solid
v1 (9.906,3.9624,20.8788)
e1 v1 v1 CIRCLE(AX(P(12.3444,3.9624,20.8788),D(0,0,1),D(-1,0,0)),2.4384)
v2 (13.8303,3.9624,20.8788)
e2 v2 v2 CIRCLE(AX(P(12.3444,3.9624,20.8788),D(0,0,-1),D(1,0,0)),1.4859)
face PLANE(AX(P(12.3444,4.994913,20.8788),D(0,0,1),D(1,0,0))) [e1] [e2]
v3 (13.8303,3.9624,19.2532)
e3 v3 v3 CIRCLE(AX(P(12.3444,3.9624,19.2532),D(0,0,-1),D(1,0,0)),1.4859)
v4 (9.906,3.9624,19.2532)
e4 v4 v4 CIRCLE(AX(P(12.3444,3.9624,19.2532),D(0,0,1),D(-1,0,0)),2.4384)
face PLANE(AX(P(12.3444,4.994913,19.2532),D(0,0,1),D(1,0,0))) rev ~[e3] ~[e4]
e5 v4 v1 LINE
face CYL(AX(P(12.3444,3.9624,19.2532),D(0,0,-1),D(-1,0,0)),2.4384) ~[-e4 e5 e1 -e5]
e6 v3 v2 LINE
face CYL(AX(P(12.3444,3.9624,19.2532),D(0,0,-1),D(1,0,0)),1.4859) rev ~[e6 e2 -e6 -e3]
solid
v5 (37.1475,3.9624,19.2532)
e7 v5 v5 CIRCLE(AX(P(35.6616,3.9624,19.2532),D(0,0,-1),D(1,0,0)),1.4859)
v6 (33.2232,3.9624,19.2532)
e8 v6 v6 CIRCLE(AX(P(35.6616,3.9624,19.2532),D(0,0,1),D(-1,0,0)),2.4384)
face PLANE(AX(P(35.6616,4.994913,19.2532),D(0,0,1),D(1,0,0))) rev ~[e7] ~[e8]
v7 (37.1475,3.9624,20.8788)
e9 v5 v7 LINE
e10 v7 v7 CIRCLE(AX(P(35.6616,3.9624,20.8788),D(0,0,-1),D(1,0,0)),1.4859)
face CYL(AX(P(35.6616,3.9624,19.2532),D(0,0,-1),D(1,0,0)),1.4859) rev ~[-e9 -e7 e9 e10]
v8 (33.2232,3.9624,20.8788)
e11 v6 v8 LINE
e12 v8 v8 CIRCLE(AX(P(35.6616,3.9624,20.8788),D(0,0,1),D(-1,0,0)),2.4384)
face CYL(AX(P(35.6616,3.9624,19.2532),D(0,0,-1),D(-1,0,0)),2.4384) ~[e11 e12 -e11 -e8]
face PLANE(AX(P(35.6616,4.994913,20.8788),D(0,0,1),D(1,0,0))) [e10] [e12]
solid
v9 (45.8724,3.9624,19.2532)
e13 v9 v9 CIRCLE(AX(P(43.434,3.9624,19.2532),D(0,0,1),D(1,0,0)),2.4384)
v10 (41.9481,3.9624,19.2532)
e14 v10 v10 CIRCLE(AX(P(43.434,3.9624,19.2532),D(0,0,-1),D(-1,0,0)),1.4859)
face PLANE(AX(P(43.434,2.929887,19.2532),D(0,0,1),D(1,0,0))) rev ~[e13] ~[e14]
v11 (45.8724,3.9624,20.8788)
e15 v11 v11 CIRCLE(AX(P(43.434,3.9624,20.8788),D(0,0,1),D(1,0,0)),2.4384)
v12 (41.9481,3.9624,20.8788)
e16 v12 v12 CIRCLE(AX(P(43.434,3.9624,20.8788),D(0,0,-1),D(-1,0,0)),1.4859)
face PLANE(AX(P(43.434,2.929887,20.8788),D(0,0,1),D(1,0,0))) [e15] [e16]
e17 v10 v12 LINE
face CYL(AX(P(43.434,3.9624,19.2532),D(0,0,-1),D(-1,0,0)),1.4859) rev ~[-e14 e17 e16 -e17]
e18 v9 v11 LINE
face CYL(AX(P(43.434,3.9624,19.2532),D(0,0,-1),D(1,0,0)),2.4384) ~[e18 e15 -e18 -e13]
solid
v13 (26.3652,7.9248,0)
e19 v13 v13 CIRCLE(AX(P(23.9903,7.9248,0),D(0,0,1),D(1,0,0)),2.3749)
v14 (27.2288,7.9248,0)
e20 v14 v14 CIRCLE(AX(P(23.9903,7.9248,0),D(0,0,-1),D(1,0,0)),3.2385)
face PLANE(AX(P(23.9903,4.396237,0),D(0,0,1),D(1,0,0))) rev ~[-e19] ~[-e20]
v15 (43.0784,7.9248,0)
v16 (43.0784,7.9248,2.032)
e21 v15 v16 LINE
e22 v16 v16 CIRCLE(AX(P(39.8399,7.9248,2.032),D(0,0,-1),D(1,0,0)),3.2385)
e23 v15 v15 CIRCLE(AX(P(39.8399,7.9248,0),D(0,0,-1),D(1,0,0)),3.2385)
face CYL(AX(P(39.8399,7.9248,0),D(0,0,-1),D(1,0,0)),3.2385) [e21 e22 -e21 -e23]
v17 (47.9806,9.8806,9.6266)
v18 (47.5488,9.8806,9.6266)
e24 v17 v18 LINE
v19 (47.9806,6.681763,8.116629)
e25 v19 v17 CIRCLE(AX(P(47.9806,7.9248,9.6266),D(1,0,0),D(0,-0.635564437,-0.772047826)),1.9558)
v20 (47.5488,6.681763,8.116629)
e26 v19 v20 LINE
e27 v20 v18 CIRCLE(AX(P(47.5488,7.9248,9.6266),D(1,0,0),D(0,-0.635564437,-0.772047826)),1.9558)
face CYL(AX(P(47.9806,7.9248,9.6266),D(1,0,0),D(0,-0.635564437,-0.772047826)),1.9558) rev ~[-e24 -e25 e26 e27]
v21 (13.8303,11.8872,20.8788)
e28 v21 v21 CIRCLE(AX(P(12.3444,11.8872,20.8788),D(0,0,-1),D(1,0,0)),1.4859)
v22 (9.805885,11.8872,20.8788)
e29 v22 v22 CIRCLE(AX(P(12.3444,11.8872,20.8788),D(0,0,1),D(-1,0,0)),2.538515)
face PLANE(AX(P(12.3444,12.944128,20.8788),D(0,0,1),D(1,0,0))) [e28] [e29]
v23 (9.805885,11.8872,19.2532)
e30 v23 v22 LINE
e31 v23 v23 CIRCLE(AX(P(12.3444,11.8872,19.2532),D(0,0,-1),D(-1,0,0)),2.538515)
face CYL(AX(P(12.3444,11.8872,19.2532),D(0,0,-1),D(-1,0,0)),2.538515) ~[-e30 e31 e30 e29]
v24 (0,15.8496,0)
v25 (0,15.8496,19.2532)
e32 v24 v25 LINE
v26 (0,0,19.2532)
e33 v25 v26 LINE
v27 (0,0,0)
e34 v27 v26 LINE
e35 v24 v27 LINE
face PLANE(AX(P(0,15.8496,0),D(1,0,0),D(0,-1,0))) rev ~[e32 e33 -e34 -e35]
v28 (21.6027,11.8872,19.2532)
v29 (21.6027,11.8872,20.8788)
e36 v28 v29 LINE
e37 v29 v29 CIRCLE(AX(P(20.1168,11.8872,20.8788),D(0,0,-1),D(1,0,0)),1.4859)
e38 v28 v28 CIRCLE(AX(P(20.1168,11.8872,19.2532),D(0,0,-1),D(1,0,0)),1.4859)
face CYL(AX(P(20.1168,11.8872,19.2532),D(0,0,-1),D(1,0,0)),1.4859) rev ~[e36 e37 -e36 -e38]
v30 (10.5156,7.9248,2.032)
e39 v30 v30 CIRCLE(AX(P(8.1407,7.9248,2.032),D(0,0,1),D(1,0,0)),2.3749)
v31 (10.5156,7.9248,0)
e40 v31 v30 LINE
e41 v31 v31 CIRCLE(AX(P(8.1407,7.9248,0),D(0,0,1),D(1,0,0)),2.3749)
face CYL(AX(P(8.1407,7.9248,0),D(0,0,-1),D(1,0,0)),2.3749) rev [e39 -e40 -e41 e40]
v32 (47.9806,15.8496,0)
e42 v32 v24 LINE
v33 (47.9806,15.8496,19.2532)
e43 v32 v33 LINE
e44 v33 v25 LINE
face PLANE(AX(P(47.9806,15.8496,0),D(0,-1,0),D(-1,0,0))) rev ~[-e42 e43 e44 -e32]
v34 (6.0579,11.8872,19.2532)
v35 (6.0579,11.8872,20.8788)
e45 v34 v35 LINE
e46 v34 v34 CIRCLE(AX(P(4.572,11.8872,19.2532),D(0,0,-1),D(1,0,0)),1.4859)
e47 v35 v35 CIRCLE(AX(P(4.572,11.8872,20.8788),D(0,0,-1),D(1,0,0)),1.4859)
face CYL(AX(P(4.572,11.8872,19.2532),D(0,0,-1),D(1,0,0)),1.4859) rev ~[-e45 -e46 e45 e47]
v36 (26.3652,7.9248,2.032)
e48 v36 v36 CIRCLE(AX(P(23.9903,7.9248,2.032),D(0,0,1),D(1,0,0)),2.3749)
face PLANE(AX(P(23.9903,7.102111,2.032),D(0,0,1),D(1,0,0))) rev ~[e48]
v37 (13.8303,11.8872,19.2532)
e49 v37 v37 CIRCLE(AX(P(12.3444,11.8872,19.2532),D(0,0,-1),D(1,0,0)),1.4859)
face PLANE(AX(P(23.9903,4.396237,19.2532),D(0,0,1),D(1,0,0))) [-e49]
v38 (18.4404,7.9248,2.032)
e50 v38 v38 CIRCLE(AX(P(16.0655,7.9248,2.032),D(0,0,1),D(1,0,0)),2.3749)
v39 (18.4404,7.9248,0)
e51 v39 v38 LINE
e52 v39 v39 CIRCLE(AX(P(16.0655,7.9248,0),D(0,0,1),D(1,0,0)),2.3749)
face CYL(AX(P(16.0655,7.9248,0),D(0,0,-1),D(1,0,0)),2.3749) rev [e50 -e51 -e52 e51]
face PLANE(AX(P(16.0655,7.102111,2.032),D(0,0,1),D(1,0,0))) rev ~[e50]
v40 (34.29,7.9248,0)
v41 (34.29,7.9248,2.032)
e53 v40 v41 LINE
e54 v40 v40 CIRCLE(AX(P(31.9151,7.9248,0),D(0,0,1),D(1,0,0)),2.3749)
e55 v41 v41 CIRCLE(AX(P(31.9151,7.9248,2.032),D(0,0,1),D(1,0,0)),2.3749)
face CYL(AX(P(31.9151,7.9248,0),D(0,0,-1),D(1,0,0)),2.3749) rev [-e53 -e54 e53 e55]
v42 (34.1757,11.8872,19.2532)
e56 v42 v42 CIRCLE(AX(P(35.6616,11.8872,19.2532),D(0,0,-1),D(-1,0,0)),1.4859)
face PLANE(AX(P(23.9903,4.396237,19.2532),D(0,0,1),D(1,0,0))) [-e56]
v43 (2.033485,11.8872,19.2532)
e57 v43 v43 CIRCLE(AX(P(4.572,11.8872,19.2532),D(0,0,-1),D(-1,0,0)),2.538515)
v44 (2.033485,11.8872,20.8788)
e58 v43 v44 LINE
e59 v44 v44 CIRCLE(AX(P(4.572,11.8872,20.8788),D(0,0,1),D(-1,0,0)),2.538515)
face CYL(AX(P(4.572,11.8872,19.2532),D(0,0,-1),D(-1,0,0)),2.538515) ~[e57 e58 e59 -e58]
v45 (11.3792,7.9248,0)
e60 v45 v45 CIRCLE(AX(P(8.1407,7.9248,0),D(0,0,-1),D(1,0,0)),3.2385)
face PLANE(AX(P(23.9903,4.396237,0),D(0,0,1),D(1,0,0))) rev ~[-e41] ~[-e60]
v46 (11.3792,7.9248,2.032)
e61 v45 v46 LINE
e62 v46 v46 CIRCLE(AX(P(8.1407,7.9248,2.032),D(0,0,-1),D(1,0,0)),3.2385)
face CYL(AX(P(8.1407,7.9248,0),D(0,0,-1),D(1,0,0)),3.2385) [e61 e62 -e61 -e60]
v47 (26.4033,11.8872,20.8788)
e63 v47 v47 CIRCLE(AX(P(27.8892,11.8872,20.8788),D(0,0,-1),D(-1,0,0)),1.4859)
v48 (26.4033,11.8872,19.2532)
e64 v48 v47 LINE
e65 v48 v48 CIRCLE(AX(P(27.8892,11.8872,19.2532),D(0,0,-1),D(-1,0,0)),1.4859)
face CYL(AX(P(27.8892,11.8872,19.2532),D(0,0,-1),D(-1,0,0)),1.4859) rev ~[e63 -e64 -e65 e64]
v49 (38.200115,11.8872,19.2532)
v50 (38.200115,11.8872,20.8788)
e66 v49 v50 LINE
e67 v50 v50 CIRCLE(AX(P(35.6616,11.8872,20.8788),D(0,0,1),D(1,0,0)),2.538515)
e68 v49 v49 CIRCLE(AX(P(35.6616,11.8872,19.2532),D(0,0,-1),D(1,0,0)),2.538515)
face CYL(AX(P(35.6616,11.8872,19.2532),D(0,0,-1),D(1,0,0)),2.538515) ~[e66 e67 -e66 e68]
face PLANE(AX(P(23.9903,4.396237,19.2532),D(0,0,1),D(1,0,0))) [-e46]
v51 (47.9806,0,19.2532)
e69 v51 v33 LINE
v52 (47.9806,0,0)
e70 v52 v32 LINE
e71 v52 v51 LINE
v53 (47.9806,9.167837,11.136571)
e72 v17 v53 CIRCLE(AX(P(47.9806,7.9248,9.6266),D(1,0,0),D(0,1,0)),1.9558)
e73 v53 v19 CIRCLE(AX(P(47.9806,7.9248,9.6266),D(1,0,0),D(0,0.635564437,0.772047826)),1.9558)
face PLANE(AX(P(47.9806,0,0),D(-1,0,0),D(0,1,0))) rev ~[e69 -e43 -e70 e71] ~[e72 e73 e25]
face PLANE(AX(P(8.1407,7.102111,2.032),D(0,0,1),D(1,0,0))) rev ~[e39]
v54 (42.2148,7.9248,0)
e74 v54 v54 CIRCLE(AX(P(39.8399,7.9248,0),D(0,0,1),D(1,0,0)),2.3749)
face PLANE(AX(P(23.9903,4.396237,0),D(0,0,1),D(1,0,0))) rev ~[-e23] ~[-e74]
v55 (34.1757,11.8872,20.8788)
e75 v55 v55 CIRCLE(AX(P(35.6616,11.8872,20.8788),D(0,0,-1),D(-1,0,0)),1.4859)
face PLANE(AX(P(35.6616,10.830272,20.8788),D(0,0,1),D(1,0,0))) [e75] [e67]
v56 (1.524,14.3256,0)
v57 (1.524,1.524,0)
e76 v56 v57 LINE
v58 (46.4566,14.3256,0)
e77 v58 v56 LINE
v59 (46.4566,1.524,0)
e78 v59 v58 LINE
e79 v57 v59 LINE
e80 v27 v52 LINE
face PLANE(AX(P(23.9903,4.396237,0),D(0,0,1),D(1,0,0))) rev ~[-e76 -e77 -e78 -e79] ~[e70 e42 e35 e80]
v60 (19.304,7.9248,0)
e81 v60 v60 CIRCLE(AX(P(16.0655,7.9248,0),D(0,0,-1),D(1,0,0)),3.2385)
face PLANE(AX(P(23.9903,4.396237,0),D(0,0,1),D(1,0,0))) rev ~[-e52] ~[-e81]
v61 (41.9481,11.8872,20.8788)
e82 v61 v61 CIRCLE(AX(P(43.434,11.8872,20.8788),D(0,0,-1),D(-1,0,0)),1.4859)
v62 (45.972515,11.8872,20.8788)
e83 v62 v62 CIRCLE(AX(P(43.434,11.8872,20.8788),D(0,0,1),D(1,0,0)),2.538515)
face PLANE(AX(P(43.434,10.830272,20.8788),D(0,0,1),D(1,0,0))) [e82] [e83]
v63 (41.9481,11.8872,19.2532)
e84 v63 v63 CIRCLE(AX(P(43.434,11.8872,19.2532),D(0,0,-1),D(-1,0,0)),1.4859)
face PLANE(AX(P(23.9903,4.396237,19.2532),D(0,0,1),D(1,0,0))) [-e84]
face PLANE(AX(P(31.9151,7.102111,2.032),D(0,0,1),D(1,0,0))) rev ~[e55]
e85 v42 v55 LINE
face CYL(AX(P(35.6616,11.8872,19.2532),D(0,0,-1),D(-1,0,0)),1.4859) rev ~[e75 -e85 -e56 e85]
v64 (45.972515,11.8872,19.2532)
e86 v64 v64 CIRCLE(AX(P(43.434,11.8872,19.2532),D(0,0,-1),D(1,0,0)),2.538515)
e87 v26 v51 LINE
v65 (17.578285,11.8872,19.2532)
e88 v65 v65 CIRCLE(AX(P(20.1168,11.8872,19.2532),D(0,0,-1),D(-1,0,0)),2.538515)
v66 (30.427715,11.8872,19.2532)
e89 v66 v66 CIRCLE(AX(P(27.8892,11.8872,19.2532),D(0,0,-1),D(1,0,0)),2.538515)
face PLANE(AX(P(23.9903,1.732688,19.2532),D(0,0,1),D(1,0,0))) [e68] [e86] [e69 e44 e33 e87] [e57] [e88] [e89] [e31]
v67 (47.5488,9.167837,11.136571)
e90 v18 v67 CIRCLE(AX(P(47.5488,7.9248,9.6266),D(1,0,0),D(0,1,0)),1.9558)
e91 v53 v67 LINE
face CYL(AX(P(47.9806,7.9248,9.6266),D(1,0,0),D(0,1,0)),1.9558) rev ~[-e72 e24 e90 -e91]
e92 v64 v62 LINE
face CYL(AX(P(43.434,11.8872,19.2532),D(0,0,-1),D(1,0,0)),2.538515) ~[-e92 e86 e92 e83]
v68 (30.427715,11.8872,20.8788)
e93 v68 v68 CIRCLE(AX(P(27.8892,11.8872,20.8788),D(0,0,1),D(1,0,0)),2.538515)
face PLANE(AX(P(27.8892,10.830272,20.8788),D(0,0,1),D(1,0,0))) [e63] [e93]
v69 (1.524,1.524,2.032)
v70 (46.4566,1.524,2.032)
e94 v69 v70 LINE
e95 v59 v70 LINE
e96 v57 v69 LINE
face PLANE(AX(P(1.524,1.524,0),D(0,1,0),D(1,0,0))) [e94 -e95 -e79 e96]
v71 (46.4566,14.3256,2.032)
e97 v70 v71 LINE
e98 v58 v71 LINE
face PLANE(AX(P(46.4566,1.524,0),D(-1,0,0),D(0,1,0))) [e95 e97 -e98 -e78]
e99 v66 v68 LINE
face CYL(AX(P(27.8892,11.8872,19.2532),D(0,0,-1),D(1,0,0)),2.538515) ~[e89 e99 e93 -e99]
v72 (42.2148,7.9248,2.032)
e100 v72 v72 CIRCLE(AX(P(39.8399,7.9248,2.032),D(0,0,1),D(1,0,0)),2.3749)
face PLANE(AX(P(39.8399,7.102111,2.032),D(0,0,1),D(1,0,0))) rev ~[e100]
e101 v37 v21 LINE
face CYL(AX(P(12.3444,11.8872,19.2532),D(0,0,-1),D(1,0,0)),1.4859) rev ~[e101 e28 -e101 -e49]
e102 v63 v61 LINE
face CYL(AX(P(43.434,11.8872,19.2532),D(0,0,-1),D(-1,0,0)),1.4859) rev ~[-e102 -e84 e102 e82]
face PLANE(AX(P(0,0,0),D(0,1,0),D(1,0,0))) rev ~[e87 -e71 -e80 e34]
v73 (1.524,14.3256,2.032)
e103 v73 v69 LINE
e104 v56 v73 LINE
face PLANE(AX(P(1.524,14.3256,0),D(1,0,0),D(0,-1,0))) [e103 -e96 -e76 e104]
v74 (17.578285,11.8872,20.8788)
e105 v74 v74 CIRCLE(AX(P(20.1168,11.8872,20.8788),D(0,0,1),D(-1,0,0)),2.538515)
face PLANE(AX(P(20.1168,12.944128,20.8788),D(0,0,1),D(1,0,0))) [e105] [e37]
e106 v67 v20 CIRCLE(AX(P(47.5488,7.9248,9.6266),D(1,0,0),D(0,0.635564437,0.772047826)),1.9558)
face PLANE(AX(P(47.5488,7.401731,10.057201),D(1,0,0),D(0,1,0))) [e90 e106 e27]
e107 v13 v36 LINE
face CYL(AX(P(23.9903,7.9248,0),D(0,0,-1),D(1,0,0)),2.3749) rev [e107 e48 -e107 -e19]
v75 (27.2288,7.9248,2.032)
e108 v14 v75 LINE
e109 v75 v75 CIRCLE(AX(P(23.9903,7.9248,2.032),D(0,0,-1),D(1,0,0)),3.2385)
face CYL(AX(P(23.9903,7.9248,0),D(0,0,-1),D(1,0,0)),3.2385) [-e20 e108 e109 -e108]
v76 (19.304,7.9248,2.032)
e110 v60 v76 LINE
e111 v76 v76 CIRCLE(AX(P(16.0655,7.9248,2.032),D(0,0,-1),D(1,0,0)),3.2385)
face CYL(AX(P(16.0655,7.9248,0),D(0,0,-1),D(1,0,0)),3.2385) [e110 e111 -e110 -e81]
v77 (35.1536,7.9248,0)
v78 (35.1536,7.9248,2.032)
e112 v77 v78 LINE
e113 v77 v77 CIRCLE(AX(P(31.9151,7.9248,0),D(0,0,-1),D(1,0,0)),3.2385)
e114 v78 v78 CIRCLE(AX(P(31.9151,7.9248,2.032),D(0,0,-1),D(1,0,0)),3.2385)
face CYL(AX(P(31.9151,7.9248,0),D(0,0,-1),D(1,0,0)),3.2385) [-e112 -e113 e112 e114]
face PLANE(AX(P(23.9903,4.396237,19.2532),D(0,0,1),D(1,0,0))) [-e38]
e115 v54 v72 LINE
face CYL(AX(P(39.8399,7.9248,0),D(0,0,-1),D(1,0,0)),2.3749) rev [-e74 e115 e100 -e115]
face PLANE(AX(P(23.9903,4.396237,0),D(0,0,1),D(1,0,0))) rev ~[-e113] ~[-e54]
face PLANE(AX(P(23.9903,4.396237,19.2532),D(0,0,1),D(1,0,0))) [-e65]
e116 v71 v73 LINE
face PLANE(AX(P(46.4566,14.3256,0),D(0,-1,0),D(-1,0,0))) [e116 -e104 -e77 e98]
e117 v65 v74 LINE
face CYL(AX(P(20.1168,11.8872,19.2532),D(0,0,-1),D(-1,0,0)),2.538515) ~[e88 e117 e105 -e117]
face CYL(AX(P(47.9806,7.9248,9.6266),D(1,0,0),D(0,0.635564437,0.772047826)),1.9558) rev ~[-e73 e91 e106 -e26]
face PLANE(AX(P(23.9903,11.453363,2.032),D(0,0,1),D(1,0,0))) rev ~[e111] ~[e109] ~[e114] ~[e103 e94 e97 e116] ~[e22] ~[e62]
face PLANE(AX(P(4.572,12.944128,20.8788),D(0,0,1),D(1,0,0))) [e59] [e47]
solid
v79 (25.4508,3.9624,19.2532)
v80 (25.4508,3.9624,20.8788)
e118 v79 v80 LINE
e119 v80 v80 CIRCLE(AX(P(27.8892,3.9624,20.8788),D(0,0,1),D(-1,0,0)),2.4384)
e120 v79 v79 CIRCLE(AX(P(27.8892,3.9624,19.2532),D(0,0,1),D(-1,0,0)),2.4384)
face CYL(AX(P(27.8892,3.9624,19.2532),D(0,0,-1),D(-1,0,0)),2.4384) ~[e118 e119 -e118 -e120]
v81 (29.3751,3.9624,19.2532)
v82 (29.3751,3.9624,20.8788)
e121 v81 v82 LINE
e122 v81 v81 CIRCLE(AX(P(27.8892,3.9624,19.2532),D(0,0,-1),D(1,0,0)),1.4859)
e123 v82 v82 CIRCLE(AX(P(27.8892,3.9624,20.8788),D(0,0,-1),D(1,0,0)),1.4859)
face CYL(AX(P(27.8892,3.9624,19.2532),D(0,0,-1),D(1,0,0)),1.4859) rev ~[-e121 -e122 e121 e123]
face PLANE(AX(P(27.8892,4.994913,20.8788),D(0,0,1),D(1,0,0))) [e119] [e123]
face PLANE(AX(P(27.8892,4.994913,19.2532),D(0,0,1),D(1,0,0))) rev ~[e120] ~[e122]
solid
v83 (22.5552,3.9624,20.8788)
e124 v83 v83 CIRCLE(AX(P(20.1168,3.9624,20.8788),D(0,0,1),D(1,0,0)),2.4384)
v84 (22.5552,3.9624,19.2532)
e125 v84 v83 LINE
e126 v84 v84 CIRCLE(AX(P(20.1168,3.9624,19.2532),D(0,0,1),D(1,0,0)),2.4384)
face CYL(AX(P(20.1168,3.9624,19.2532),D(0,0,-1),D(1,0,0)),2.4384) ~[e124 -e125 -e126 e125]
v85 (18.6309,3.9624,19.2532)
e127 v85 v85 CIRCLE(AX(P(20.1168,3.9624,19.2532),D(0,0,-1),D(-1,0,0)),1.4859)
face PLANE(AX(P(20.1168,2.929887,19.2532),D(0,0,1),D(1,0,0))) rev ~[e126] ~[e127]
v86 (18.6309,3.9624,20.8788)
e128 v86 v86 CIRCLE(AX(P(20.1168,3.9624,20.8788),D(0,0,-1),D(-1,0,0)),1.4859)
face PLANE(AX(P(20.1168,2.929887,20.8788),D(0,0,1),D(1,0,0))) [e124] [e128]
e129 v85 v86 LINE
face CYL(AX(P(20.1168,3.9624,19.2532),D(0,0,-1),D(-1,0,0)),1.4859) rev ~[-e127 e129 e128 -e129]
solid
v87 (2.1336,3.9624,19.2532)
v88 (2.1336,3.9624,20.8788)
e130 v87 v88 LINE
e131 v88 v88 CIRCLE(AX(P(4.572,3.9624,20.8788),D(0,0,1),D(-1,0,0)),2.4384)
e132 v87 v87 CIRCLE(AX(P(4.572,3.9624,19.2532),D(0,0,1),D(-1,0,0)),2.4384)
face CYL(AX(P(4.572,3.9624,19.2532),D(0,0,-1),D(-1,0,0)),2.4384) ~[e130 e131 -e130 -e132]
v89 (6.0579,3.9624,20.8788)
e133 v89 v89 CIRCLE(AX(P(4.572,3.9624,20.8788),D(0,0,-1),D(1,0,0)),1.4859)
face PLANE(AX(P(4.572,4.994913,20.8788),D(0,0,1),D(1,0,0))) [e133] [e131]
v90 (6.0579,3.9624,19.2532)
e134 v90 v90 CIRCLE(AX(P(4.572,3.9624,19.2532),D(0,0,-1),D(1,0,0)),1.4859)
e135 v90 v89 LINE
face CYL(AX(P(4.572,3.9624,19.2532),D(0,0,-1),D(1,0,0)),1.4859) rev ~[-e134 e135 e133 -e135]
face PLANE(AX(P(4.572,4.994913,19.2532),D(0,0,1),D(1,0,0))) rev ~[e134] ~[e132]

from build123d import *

# Parameters (mm, degrees)
F1_DEPTH  = 19.2532
F4_DEPTH  = 1.6256
F7_DEPTH  = 0.4318
F9_DEPTH  = 19.2532
F10_DEPTH = 2.032


with BuildPart() as f1:
    # F0 (on Top) → F1 (new body)
    with BuildSketch(Plane.XY):
        Polygon((0, 7.9248), (0, 0), (47.9806, 0), (47.9806, 7.9248), (46.4566, 7.9248), (46.4566, 1.524), (1.524, 1.524), (1.524, 7.9248), align=None)
        Polygon((0, 15.8496), (0, 7.9248), (1.524, 7.9248), (1.524, 14.3256), (46.4566, 14.3256), (46.4566, 7.9248), (47.9806, 7.9248), (47.9806, 15.8496), align=None)
    extrude(amount=F1_DEPTH)



with BuildPart() as f1b:
    # F0 (on Top) → F1, piece 2 (new body)
    with BuildSketch(Plane.XY):
        with BuildLine():
            ThreePointArc((36.6014, 7.9248), (39.8399, 4.6863), (43.0784, 7.9248))
            Line((43.0784, 7.9248), (42.2148, 7.9248))
            ThreePointArc((42.2148, 7.9248), (39.8399, 5.5499), (37.465, 7.9248))
            Line((37.465, 7.9248), (36.6014, 7.9248))
        make_face()
        with BuildLine():
            Line((42.2148, 7.9248), (43.0784, 7.9248))
            ThreePointArc((43.0784, 7.9248), (39.8399, 11.1633), (36.6014, 7.9248))
            Line((36.6014, 7.9248), (37.465, 7.9248))
            ThreePointArc((37.465, 7.9248), (39.8399, 10.2997), (42.2148, 7.9248))
        make_face()
    extrude(amount=F1_DEPTH)


with BuildPart() as f4:
    # F3 (on face) → F4 (new body)
    with BuildSketch(Plane.XY.offset(19.2532)):
        with BuildLine():
            ThreePointArc((7.0104, 3.9624), (4.572, 6.4008), (2.1336, 3.9624))
            Line((2.1336, 3.9624), (3.0861, 3.9624))
            ThreePointArc((3.0861, 3.9624), (4.572, 5.4483), (6.0579, 3.9624))
            Line((6.0579, 3.9624), (7.0104, 3.9624))
        make_face()
        with BuildLine():
            Line((3.0861, 3.9624), (2.1336, 3.9624))
            ThreePointArc((2.1336, 3.9624), (4.572, 1.524), (7.0104, 3.9624))
            Line((7.0104, 3.9624), (6.0579, 3.9624))
            ThreePointArc((6.0579, 3.9624), (4.572, 2.4765), (3.0861, 3.9624))
        make_face()
    extrude(amount=F4_DEPTH)


with BuildPart() as f4b:
    # F3 (on face) → F4, piece 2 (new body)
    with BuildSketch(Plane.XY.offset(19.2532)):
        with BuildLine():
            ThreePointArc((17.6784, 3.9624), (20.1168, 1.524), (22.5552, 3.9624))
            Line((22.5552, 3.9624), (21.6027, 3.9624))
            ThreePointArc((21.6027, 3.9624), (20.1168, 2.4765), (18.6309, 3.9624))
            Line((18.6309, 3.9624), (17.6784, 3.9624))
        make_face()
        with BuildLine():
            Line((21.6027, 3.9624), (22.5552, 3.9624))
            ThreePointArc((22.5552, 3.9624), (20.1168, 6.4008), (17.6784, 3.9624))
            Line((17.6784, 3.9624), (18.6309, 3.9624))
            ThreePointArc((18.6309, 3.9624), (20.1168, 5.4483), (21.6027, 3.9624))
        make_face()
    extrude(amount=F4_DEPTH)


with BuildPart() as f4c:
    # F3 (on face) → F4, piece 3 (new body)
    with BuildSketch(Plane.XY.offset(19.2532)):
        with BuildLine():
            ThreePointArc((30.3276, 3.9624), (27.8892, 6.4008), (25.4508, 3.9624))
            Line((25.4508, 3.9624), (26.4033, 3.9624))
            ThreePointArc((26.4033, 3.9624), (27.8892, 5.4483), (29.3751, 3.9624))
            Line((29.3751, 3.9624), (30.3276, 3.9624))
        make_face()
        with BuildLine():
            Line((26.4033, 3.9624), (25.4508, 3.9624))
            ThreePointArc((25.4508, 3.9624), (27.8892, 1.524), (30.3276, 3.9624))
            Line((30.3276, 3.9624), (29.3751, 3.9624))
            ThreePointArc((29.3751, 3.9624), (27.8892, 2.4765), (26.4033, 3.9624))
        make_face()
    extrude(amount=F4_DEPTH)


with BuildPart() as f4d:
    # F3 (on face) → F4, piece 4 (new body)
    with BuildSketch(Plane.XY.offset(19.2532)):
        with BuildLine():
            ThreePointArc((40.9956, 3.9624), (43.434, 1.524), (45.8724, 3.9624))
            Line((45.8724, 3.9624), (44.9199, 3.9624))
            ThreePointArc((44.9199, 3.9624), (43.434, 2.4765), (41.9481, 3.9624))
            Line((41.9481, 3.9624), (40.9956, 3.9624))
        make_face()
        with BuildLine():
            Line((44.9199, 3.9624), (45.8724, 3.9624))
            ThreePointArc((45.8724, 3.9624), (43.434, 6.4008), (40.9956, 3.9624))
            Line((40.9956, 3.9624), (41.9481, 3.9624))
            ThreePointArc((41.9481, 3.9624), (43.434, 5.4483), (44.9199, 3.9624))
        make_face()
    extrude(amount=F4_DEPTH)


with BuildPart() as f4e:
    # F3 (on face) → F4, piece 5 (new body)
    with BuildSketch(Plane.XY.offset(19.2532)):
        with BuildLine():
            ThreePointArc((14.7828, 3.9624), (12.3444, 6.4008), (9.906, 3.9624))
            Line((9.906, 3.9624), (10.8585, 3.9624))
            ThreePointArc((10.8585, 3.9624), (12.3444, 5.4483), (13.8303, 3.9624))
            Line((13.8303, 3.9624), (14.7828, 3.9624))
        make_face()
        with BuildLine():
            Line((10.8585, 3.9624), (9.906, 3.9624))
            ThreePointArc((9.906, 3.9624), (12.3444, 1.524), (14.7828, 3.9624))
            Line((14.7828, 3.9624), (13.8303, 3.9624))
            ThreePointArc((13.8303, 3.9624), (12.3444, 2.4765), (10.8585, 3.9624))
        make_face()
    extrude(amount=F4_DEPTH)


with BuildPart() as f4f:
    # F3 (on face) → F4, piece 6 (new body)
    with BuildSketch(Plane.XY.offset(19.2532)):
        with BuildLine():
            ThreePointArc((38.1, 3.9624), (35.6616, 6.4008), (33.2232, 3.9624))
            Line((33.2232, 3.9624), (34.1757, 3.9624))
            ThreePointArc((34.1757, 3.9624), (35.6616, 5.4483), (37.1475, 3.9624))
            Line((37.1475, 3.9624), (38.1, 3.9624))
        make_face()
        with BuildLine():
            Line((34.1757, 3.9624), (33.2232, 3.9624))
            ThreePointArc((33.2232, 3.9624), (35.6616, 1.524), (38.1, 3.9624))
            Line((38.1, 3.9624), (37.1475, 3.9624))
            ThreePointArc((37.1475, 3.9624), (35.6616, 2.4765), (34.1757, 3.9624))
        make_face()
    extrude(amount=F4_DEPTH)


with BuildPart() as f1_1:
    add(f1.part)

    add(f1b.part)  # F4#7 merges F1b
    # F3 (on face) → F4, piece 7 (join)
    with BuildSketch(Plane.XY.offset(19.2532)):
        with BuildLine():
            ThreePointArc((7.1105154008, 11.8872), (4.572, 14.4257154008), (2.0334845992, 11.8872))
            Line((2.0334845992, 11.8872), (3.0861, 11.8872))
            ThreePointArc((3.0861, 11.8872), (4.572, 13.3731), (6.0579, 11.8872))
            Line((6.0579, 11.8872), (7.1105154008, 11.8872))
        make_face()
        with BuildLine():
            Line((3.0861, 11.8872), (2.0334845992, 11.8872))
            ThreePointArc((2.0334845992, 11.8872), (4.572, 9.3486845992), (7.1105154008, 11.8872))
            Line((7.1105154008, 11.8872), (6.0579, 11.8872))
            ThreePointArc((6.0579, 11.8872), (4.572, 10.4013), (3.0861, 11.8872))
        make_face()
        with BuildLine():
            ThreePointArc((40.8954845992, 11.8872), (43.434, 9.3486845992), (45.9725154008, 11.8872))
            Line((45.9725154008, 11.8872), (44.9199, 11.8872))
            ThreePointArc((44.9199, 11.8872), (43.434, 10.4013), (41.9481, 11.8872))
            Line((41.9481, 11.8872), (40.8954845992, 11.8872))
        make_face()
        with BuildLine():
            Line((44.9199, 11.8872), (45.9725154008, 11.8872))
            ThreePointArc((45.9725154008, 11.8872), (43.434, 14.4257154008), (40.8954845992, 11.8872))
            Line((40.8954845992, 11.8872), (41.9481, 11.8872))
            ThreePointArc((41.9481, 11.8872), (43.434, 13.3731), (44.9199, 11.8872))
        make_face()
        with BuildLine():
            ThreePointArc((14.8829154008, 11.8872), (12.3444, 14.4257154008), (9.8058845992, 11.8872))
            Line((9.8058845992, 11.8872), (10.8585, 11.8872))
            ThreePointArc((10.8585, 11.8872), (12.3444, 13.3731), (13.8303, 11.8872))
            Line((13.8303, 11.8872), (14.8829154008, 11.8872))
        make_face()
        with BuildLine():
            Line((10.8585, 11.8872), (9.8058845992, 11.8872))
            ThreePointArc((9.8058845992, 11.8872), (12.3444, 9.3486845992), (14.8829154008, 11.8872))
            Line((14.8829154008, 11.8872), (13.8303, 11.8872))
            ThreePointArc((13.8303, 11.8872), (12.3444, 10.4013), (10.8585, 11.8872))
        make_face()
        with BuildLine():
            ThreePointArc((33.1230845992, 11.8872), (35.6616, 9.3486845992), (38.2001154008, 11.8872))
            Line((38.2001154008, 11.8872), (37.1475, 11.8872))
            ThreePointArc((37.1475, 11.8872), (35.6616, 10.4013), (34.1757, 11.8872))
            Line((34.1757, 11.8872), (33.1230845992, 11.8872))
        make_face()
        with BuildLine():
            Line((37.1475, 11.8872), (38.2001154008, 11.8872))
            ThreePointArc((38.2001154008, 11.8872), (35.6616, 14.4257154008), (33.1230845992, 11.8872))
            Line((33.1230845992, 11.8872), (34.1757, 11.8872))
            ThreePointArc((34.1757, 11.8872), (35.6616, 13.3731), (37.1475, 11.8872))
        make_face()
        with BuildLine():
            ThreePointArc((22.6553154008, 11.8872), (20.1168, 14.4257154008), (17.5782845992, 11.8872))
            Line((17.5782845992, 11.8872), (18.6309, 11.8872))
            ThreePointArc((18.6309, 11.8872), (20.1168, 13.3731), (21.6027, 11.8872))
            Line((21.6027, 11.8872), (22.6553154008, 11.8872))
        make_face()
        with BuildLine():
            Line((18.6309, 11.8872), (17.5782845992, 11.8872))
            ThreePointArc((17.5782845992, 11.8872), (20.1168, 9.3486845992), (22.6553154008, 11.8872))
            Line((22.6553154008, 11.8872), (21.6027, 11.8872))
            ThreePointArc((21.6027, 11.8872), (20.1168, 10.4013), (18.6309, 11.8872))
        make_face()
        with BuildLine():
            ThreePointArc((25.3506845992, 11.8872), (27.8892, 9.3486845992), (30.4277154008, 11.8872))
            Line((30.4277154008, 11.8872), (29.3751, 11.8872))
            ThreePointArc((29.3751, 11.8872), (27.8892, 10.4013), (26.4033, 11.8872))
            Line((26.4033, 11.8872), (25.3506845992, 11.8872))
        make_face()
        with BuildLine():
            Line((29.3751, 11.8872), (30.4277154008, 11.8872))
            ThreePointArc((30.4277154008, 11.8872), (27.8892, 14.4257154008), (25.3506845992, 11.8872))
            Line((25.3506845992, 11.8872), (26.4033, 11.8872))
            ThreePointArc((26.4033, 11.8872), (27.8892, 13.3731), (29.3751, 11.8872))
        make_face()
    extrude(amount=F4_DEPTH)

    # F6 (on offset) → F7 (cut)
    with BuildSketch(Plane.YZ.offset(47.9806)):
        with BuildLine():
            ThreePointArc((9.1678369266, 11.1365711385), (6.4148288615, 10.8696369266), (6.6817630734, 8.1166288615))
            Line((6.6817630734, 8.1166288615), (9.1678369266, 11.1365711385))
        make_face()
        with BuildLine():
            Line((9.1678369266, 11.1365711385), (6.6817630734, 8.1166288615))
            ThreePointArc((6.6817630734, 8.1166288615), (8.7596718521, 7.8579444002), (9.8806, 9.6266))
            ThreePointArc((9.8806, 9.6266), (9.6934555998, 10.4614718521), (9.1678369266, 11.1365711385))
        make_face()
    extrude(amount=-F7_DEPTH, mode=Mode.SUBTRACT)

    # F0 (on Top) → F9 (join)
    with BuildSketch(Plane.XY):
        with BuildLine():
            Line((4.9022, 7.9248), (1.524, 7.9248))
            Line((1.524, 7.9248), (1.524, 1.524))
            Line((1.524, 1.524), (46.4566, 1.524))
            Line((46.4566, 1.524), (46.4566, 7.9248))
            Line((46.4566, 7.9248), (43.0784, 7.9248))
            ThreePointArc((43.0784, 7.9248), (39.8399, 4.6863), (36.6014, 7.9248))
            Line((36.6014, 7.9248), (35.1536, 7.9248))
            ThreePointArc((35.1536, 7.9248), (31.9151, 4.6863), (28.6766, 7.9248))
            Line((28.6766, 7.9248), (27.2288, 7.9248))
            ThreePointArc((27.2288, 7.9248), (23.9903, 4.6863), (20.7518, 7.9248))
            Line((20.7518, 7.9248), (19.304, 7.9248))
            ThreePointArc((19.304, 7.9248), (16.0655, 4.6863), (12.827, 7.9248))
            Line((12.827, 7.9248), (11.3792, 7.9248))
            ThreePointArc((11.3792, 7.9248), (8.1407, 4.6863), (4.9022, 7.9248))
        make_face()
        with BuildLine():
            Line((1.524, 14.3256), (1.524, 7.9248))
            Line((1.524, 7.9248), (4.9022, 7.9248))
            ThreePointArc((4.9022, 7.9248), (8.1407, 11.1633), (11.3792, 7.9248))
            Line((11.3792, 7.9248), (12.827, 7.9248))
            ThreePointArc((12.827, 7.9248), (16.0655, 11.1633), (19.304, 7.9248))
            Line((19.304, 7.9248), (20.7518, 7.9248))
            ThreePointArc((20.7518, 7.9248), (23.9903, 11.1633), (27.2288, 7.9248))
            Line((27.2288, 7.9248), (28.6766, 7.9248))
            ThreePointArc((28.6766, 7.9248), (31.9151, 11.1633), (35.1536, 7.9248))
            Line((35.1536, 7.9248), (36.6014, 7.9248))
            ThreePointArc((36.6014, 7.9248), (39.8399, 11.1633), (43.0784, 7.9248))
            Line((43.0784, 7.9248), (46.4566, 7.9248))
            Line((46.4566, 7.9248), (46.4566, 14.3256))
            Line((46.4566, 14.3256), (1.524, 14.3256))
        make_face()
        with BuildLine():
            Line((8.1407, 7.9248), (5.7658, 7.9248))
            ThreePointArc((5.7658, 7.9248), (8.1407, 5.5499), (10.5156, 7.9248))
            Line((10.5156, 7.9248), (8.1407, 7.9248))
        make_face()
        with BuildLine():
            Line((16.0655, 7.9248), (13.6906, 7.9248))
            ThreePointArc((13.6906, 7.9248), (16.0655, 5.5499), (18.4404, 7.9248))
            Line((18.4404, 7.9248), (16.0655, 7.9248))
        make_face()
        with BuildLine():
            ThreePointArc((18.4404, 7.9248), (16.0655, 10.2997), (13.6906, 7.9248))
            Line((13.6906, 7.9248), (16.0655, 7.9248))
            Line((16.0655, 7.9248), (18.4404, 7.9248))
        make_face()
        with BuildLine():
            Line((23.9903, 7.9248), (21.6154, 7.9248))
            ThreePointArc((21.6154, 7.9248), (23.9903, 5.5499), (26.3652, 7.9248))
            Line((26.3652, 7.9248), (23.9903, 7.9248))
        make_face()
        with BuildLine():
            ThreePointArc((26.3652, 7.9248), (23.9903, 10.2997), (21.6154, 7.9248))
            Line((21.6154, 7.9248), (23.9903, 7.9248))
            Line((23.9903, 7.9248), (26.3652, 7.9248))
        make_face()
        with BuildLine():
            ThreePointArc((29.5402, 7.9248), (31.9151, 5.5499), (34.29, 7.9248))
            Line((34.29, 7.9248), (31.9151, 7.9248))
            Line((31.9151, 7.9248), (29.5402, 7.9248))
        make_face()
        with BuildLine():
            Line((31.9151, 7.9248), (34.29, 7.9248))
            ThreePointArc((34.29, 7.9248), (31.9151, 10.2997), (29.5402, 7.9248))
            Line((29.5402, 7.9248), (31.9151, 7.9248))
        make_face()
        with BuildLine():
            Line((5.7658, 7.9248), (4.9022, 7.9248))
            ThreePointArc((4.9022, 7.9248), (8.1407, 4.6863), (11.3792, 7.9248))
            Line((11.3792, 7.9248), (10.5156, 7.9248))
            ThreePointArc((10.5156, 7.9248), (8.1407, 5.5499), (5.7658, 7.9248))
        make_face()
        with BuildLine():
            Line((13.6906, 7.9248), (12.827, 7.9248))
            ThreePointArc((12.827, 7.9248), (16.0655, 4.6863), (19.304, 7.9248))
            Line((19.304, 7.9248), (18.4404, 7.9248))
            ThreePointArc((18.4404, 7.9248), (16.0655, 5.5499), (13.6906, 7.9248))
        make_face()
        with BuildLine():
            ThreePointArc((19.304, 7.9248), (16.0655, 11.1633), (12.827, 7.9248))
            Line((12.827, 7.9248), (13.6906, 7.9248))
            ThreePointArc((13.6906, 7.9248), (16.0655, 10.2997), (18.4404, 7.9248))
            Line((18.4404, 7.9248), (19.304, 7.9248))
        make_face()
        with BuildLine():
            Line((21.6154, 7.9248), (20.7518, 7.9248))
            ThreePointArc((20.7518, 7.9248), (23.9903, 4.6863), (27.2288, 7.9248))
            Line((27.2288, 7.9248), (26.3652, 7.9248))
            ThreePointArc((26.3652, 7.9248), (23.9903, 5.5499), (21.6154, 7.9248))
        make_face()
        with BuildLine():
            ThreePointArc((27.2288, 7.9248), (23.9903, 11.1633), (20.7518, 7.9248))
            Line((20.7518, 7.9248), (21.6154, 7.9248))
            ThreePointArc((21.6154, 7.9248), (23.9903, 10.2997), (26.3652, 7.9248))
            Line((26.3652, 7.9248), (27.2288, 7.9248))
        make_face()
        with BuildLine():
            ThreePointArc((28.6766, 7.9248), (31.9151, 4.6863), (35.1536, 7.9248))
            Line((35.1536, 7.9248), (34.29, 7.9248))
            ThreePointArc((34.29, 7.9248), (31.9151, 5.5499), (29.5402, 7.9248))
            Line((29.5402, 7.9248), (28.6766, 7.9248))
        make_face()
        with BuildLine():
            Line((34.29, 7.9248), (35.1536, 7.9248))
            ThreePointArc((35.1536, 7.9248), (31.9151, 11.1633), (28.6766, 7.9248))
            Line((28.6766, 7.9248), (29.5402, 7.9248))
            ThreePointArc((29.5402, 7.9248), (31.9151, 10.2997), (34.29, 7.9248))
        make_face()
        with BuildLine():
            ThreePointArc((37.465, 7.9248), (39.8399, 5.5499), (42.2148, 7.9248))
            Line((42.2148, 7.9248), (39.8399, 7.9248))
            Line((39.8399, 7.9248), (37.465, 7.9248))
        make_face()
        with BuildLine():
            Line((39.8399, 7.9248), (42.2148, 7.9248))
            ThreePointArc((42.2148, 7.9248), (39.8399, 10.2997), (37.465, 7.9248))
            Line((37.465, 7.9248), (39.8399, 7.9248))
        make_face()
        with BuildLine():
            ThreePointArc((11.3792, 7.9248), (8.1407, 11.1633), (4.9022, 7.9248))
            Line((4.9022, 7.9248), (5.7658, 7.9248))
            ThreePointArc((5.7658, 7.9248), (8.1407, 10.2997), (10.5156, 7.9248))
            Line((10.5156, 7.9248), (11.3792, 7.9248))
        make_face()
        with BuildLine():
            ThreePointArc((10.5156, 7.9248), (8.1407, 10.2997), (5.7658, 7.9248))
            Line((5.7658, 7.9248), (8.1407, 7.9248))
            Line((8.1407, 7.9248), (10.5156, 7.9248))
        make_face()
    extrude(amount=F9_DEPTH)

    # F0 (on Top) → F10 (cut)
    with BuildSketch(Plane.XY):
        with BuildLine():
            Line((1.524, 14.3256), (1.524, 7.9248))
            Line((1.524, 7.9248), (4.9022, 7.9248))
            ThreePointArc((4.9022, 7.9248), (8.1407, 11.1633), (11.3792, 7.9248))
            Line((11.3792, 7.9248), (12.827, 7.9248))
            ThreePointArc((12.827, 7.9248), (16.0655, 11.1633), (19.304, 7.9248))
            Line((19.304, 7.9248), (20.7518, 7.9248))
            ThreePointArc((20.7518, 7.9248), (23.9903, 11.1633), (27.2288, 7.9248))
            Line((27.2288, 7.9248), (28.6766, 7.9248))
            ThreePointArc((28.6766, 7.9248), (31.9151, 11.1633), (35.1536, 7.9248))
            Line((35.1536, 7.9248), (36.6014, 7.9248))
            ThreePointArc((36.6014, 7.9248), (39.8399, 11.1633), (43.0784, 7.9248))
            Line((43.0784, 7.9248), (46.4566, 7.9248))
            Line((46.4566, 7.9248), (46.4566, 14.3256))
            Line((46.4566, 14.3256), (1.524, 14.3256))
        make_face()
        with BuildLine():
            Line((4.9022, 7.9248), (1.524, 7.9248))
            Line((1.524, 7.9248), (1.524, 1.524))
            Line((1.524, 1.524), (46.4566, 1.524))
            Line((46.4566, 1.524), (46.4566, 7.9248))
            Line((46.4566, 7.9248), (43.0784, 7.9248))
            ThreePointArc((43.0784, 7.9248), (39.8399, 4.6863), (36.6014, 7.9248))
            Line((36.6014, 7.9248), (35.1536, 7.9248))
            ThreePointArc((35.1536, 7.9248), (31.9151, 4.6863), (28.6766, 7.9248))
            Line((28.6766, 7.9248), (27.2288, 7.9248))
            ThreePointArc((27.2288, 7.9248), (23.9903, 4.6863), (20.7518, 7.9248))
            Line((20.7518, 7.9248), (19.304, 7.9248))
            ThreePointArc((19.304, 7.9248), (16.0655, 4.6863), (12.827, 7.9248))
            Line((12.827, 7.9248), (11.3792, 7.9248))
            ThreePointArc((11.3792, 7.9248), (8.1407, 4.6863), (4.9022, 7.9248))
        make_face()
        with BuildLine():
            Line((16.0655, 7.9248), (13.6906, 7.9248))
            ThreePointArc((13.6906, 7.9248), (16.0655, 5.5499), (18.4404, 7.9248))
            Line((18.4404, 7.9248), (16.0655, 7.9248))
        make_face()
        with BuildLine():
            Line((8.1407, 7.9248), (5.7658, 7.9248))
            ThreePointArc((5.7658, 7.9248), (8.1407, 5.5499), (10.5156, 7.9248))
            Line((10.5156, 7.9248), (8.1407, 7.9248))
        make_face()
        with BuildLine():
            ThreePointArc((10.5156, 7.9248), (8.1407, 10.2997), (5.7658, 7.9248))
            Line((5.7658, 7.9248), (8.1407, 7.9248))
            Line((8.1407, 7.9248), (10.5156, 7.9248))
        make_face()
        with BuildLine():
            ThreePointArc((18.4404, 7.9248), (16.0655, 10.2997), (13.6906, 7.9248))
            Line((13.6906, 7.9248), (16.0655, 7.9248))
            Line((16.0655, 7.9248), (18.4404, 7.9248))
        make_face()
        with BuildLine():
            Line((23.9903, 7.9248), (21.6154, 7.9248))
            ThreePointArc((21.6154, 7.9248), (23.9903, 5.5499), (26.3652, 7.9248))
            Line((26.3652, 7.9248), (23.9903, 7.9248))
        make_face()
        with BuildLine():
            ThreePointArc((26.3652, 7.9248), (23.9903, 10.2997), (21.6154, 7.9248))
            Line((21.6154, 7.9248), (23.9903, 7.9248))
            Line((23.9903, 7.9248), (26.3652, 7.9248))
        make_face()
        with BuildLine():
            ThreePointArc((29.5402, 7.9248), (31.9151, 5.5499), (34.29, 7.9248))
            Line((34.29, 7.9248), (31.9151, 7.9248))
            Line((31.9151, 7.9248), (29.5402, 7.9248))
        make_face()
        with BuildLine():
            Line((31.9151, 7.9248), (34.29, 7.9248))
            ThreePointArc((34.29, 7.9248), (31.9151, 10.2997), (29.5402, 7.9248))
            Line((29.5402, 7.9248), (31.9151, 7.9248))
        make_face()
        with BuildLine():
            ThreePointArc((37.465, 7.9248), (39.8399, 5.5499), (42.2148, 7.9248))
            Line((42.2148, 7.9248), (39.8399, 7.9248))
            Line((39.8399, 7.9248), (37.465, 7.9248))
        make_face()
        with BuildLine():
            Line((39.8399, 7.9248), (42.2148, 7.9248))
            ThreePointArc((42.2148, 7.9248), (39.8399, 10.2997), (37.465, 7.9248))
            Line((37.465, 7.9248), (39.8399, 7.9248))
        make_face()
    extrude(amount=F10_DEPTH, mode=Mode.SUBTRACT)


solid = Compound([f4.part, f4b.part, f4c.part, f4d.part, f4e.part, f4f.part, f1_1.part])
